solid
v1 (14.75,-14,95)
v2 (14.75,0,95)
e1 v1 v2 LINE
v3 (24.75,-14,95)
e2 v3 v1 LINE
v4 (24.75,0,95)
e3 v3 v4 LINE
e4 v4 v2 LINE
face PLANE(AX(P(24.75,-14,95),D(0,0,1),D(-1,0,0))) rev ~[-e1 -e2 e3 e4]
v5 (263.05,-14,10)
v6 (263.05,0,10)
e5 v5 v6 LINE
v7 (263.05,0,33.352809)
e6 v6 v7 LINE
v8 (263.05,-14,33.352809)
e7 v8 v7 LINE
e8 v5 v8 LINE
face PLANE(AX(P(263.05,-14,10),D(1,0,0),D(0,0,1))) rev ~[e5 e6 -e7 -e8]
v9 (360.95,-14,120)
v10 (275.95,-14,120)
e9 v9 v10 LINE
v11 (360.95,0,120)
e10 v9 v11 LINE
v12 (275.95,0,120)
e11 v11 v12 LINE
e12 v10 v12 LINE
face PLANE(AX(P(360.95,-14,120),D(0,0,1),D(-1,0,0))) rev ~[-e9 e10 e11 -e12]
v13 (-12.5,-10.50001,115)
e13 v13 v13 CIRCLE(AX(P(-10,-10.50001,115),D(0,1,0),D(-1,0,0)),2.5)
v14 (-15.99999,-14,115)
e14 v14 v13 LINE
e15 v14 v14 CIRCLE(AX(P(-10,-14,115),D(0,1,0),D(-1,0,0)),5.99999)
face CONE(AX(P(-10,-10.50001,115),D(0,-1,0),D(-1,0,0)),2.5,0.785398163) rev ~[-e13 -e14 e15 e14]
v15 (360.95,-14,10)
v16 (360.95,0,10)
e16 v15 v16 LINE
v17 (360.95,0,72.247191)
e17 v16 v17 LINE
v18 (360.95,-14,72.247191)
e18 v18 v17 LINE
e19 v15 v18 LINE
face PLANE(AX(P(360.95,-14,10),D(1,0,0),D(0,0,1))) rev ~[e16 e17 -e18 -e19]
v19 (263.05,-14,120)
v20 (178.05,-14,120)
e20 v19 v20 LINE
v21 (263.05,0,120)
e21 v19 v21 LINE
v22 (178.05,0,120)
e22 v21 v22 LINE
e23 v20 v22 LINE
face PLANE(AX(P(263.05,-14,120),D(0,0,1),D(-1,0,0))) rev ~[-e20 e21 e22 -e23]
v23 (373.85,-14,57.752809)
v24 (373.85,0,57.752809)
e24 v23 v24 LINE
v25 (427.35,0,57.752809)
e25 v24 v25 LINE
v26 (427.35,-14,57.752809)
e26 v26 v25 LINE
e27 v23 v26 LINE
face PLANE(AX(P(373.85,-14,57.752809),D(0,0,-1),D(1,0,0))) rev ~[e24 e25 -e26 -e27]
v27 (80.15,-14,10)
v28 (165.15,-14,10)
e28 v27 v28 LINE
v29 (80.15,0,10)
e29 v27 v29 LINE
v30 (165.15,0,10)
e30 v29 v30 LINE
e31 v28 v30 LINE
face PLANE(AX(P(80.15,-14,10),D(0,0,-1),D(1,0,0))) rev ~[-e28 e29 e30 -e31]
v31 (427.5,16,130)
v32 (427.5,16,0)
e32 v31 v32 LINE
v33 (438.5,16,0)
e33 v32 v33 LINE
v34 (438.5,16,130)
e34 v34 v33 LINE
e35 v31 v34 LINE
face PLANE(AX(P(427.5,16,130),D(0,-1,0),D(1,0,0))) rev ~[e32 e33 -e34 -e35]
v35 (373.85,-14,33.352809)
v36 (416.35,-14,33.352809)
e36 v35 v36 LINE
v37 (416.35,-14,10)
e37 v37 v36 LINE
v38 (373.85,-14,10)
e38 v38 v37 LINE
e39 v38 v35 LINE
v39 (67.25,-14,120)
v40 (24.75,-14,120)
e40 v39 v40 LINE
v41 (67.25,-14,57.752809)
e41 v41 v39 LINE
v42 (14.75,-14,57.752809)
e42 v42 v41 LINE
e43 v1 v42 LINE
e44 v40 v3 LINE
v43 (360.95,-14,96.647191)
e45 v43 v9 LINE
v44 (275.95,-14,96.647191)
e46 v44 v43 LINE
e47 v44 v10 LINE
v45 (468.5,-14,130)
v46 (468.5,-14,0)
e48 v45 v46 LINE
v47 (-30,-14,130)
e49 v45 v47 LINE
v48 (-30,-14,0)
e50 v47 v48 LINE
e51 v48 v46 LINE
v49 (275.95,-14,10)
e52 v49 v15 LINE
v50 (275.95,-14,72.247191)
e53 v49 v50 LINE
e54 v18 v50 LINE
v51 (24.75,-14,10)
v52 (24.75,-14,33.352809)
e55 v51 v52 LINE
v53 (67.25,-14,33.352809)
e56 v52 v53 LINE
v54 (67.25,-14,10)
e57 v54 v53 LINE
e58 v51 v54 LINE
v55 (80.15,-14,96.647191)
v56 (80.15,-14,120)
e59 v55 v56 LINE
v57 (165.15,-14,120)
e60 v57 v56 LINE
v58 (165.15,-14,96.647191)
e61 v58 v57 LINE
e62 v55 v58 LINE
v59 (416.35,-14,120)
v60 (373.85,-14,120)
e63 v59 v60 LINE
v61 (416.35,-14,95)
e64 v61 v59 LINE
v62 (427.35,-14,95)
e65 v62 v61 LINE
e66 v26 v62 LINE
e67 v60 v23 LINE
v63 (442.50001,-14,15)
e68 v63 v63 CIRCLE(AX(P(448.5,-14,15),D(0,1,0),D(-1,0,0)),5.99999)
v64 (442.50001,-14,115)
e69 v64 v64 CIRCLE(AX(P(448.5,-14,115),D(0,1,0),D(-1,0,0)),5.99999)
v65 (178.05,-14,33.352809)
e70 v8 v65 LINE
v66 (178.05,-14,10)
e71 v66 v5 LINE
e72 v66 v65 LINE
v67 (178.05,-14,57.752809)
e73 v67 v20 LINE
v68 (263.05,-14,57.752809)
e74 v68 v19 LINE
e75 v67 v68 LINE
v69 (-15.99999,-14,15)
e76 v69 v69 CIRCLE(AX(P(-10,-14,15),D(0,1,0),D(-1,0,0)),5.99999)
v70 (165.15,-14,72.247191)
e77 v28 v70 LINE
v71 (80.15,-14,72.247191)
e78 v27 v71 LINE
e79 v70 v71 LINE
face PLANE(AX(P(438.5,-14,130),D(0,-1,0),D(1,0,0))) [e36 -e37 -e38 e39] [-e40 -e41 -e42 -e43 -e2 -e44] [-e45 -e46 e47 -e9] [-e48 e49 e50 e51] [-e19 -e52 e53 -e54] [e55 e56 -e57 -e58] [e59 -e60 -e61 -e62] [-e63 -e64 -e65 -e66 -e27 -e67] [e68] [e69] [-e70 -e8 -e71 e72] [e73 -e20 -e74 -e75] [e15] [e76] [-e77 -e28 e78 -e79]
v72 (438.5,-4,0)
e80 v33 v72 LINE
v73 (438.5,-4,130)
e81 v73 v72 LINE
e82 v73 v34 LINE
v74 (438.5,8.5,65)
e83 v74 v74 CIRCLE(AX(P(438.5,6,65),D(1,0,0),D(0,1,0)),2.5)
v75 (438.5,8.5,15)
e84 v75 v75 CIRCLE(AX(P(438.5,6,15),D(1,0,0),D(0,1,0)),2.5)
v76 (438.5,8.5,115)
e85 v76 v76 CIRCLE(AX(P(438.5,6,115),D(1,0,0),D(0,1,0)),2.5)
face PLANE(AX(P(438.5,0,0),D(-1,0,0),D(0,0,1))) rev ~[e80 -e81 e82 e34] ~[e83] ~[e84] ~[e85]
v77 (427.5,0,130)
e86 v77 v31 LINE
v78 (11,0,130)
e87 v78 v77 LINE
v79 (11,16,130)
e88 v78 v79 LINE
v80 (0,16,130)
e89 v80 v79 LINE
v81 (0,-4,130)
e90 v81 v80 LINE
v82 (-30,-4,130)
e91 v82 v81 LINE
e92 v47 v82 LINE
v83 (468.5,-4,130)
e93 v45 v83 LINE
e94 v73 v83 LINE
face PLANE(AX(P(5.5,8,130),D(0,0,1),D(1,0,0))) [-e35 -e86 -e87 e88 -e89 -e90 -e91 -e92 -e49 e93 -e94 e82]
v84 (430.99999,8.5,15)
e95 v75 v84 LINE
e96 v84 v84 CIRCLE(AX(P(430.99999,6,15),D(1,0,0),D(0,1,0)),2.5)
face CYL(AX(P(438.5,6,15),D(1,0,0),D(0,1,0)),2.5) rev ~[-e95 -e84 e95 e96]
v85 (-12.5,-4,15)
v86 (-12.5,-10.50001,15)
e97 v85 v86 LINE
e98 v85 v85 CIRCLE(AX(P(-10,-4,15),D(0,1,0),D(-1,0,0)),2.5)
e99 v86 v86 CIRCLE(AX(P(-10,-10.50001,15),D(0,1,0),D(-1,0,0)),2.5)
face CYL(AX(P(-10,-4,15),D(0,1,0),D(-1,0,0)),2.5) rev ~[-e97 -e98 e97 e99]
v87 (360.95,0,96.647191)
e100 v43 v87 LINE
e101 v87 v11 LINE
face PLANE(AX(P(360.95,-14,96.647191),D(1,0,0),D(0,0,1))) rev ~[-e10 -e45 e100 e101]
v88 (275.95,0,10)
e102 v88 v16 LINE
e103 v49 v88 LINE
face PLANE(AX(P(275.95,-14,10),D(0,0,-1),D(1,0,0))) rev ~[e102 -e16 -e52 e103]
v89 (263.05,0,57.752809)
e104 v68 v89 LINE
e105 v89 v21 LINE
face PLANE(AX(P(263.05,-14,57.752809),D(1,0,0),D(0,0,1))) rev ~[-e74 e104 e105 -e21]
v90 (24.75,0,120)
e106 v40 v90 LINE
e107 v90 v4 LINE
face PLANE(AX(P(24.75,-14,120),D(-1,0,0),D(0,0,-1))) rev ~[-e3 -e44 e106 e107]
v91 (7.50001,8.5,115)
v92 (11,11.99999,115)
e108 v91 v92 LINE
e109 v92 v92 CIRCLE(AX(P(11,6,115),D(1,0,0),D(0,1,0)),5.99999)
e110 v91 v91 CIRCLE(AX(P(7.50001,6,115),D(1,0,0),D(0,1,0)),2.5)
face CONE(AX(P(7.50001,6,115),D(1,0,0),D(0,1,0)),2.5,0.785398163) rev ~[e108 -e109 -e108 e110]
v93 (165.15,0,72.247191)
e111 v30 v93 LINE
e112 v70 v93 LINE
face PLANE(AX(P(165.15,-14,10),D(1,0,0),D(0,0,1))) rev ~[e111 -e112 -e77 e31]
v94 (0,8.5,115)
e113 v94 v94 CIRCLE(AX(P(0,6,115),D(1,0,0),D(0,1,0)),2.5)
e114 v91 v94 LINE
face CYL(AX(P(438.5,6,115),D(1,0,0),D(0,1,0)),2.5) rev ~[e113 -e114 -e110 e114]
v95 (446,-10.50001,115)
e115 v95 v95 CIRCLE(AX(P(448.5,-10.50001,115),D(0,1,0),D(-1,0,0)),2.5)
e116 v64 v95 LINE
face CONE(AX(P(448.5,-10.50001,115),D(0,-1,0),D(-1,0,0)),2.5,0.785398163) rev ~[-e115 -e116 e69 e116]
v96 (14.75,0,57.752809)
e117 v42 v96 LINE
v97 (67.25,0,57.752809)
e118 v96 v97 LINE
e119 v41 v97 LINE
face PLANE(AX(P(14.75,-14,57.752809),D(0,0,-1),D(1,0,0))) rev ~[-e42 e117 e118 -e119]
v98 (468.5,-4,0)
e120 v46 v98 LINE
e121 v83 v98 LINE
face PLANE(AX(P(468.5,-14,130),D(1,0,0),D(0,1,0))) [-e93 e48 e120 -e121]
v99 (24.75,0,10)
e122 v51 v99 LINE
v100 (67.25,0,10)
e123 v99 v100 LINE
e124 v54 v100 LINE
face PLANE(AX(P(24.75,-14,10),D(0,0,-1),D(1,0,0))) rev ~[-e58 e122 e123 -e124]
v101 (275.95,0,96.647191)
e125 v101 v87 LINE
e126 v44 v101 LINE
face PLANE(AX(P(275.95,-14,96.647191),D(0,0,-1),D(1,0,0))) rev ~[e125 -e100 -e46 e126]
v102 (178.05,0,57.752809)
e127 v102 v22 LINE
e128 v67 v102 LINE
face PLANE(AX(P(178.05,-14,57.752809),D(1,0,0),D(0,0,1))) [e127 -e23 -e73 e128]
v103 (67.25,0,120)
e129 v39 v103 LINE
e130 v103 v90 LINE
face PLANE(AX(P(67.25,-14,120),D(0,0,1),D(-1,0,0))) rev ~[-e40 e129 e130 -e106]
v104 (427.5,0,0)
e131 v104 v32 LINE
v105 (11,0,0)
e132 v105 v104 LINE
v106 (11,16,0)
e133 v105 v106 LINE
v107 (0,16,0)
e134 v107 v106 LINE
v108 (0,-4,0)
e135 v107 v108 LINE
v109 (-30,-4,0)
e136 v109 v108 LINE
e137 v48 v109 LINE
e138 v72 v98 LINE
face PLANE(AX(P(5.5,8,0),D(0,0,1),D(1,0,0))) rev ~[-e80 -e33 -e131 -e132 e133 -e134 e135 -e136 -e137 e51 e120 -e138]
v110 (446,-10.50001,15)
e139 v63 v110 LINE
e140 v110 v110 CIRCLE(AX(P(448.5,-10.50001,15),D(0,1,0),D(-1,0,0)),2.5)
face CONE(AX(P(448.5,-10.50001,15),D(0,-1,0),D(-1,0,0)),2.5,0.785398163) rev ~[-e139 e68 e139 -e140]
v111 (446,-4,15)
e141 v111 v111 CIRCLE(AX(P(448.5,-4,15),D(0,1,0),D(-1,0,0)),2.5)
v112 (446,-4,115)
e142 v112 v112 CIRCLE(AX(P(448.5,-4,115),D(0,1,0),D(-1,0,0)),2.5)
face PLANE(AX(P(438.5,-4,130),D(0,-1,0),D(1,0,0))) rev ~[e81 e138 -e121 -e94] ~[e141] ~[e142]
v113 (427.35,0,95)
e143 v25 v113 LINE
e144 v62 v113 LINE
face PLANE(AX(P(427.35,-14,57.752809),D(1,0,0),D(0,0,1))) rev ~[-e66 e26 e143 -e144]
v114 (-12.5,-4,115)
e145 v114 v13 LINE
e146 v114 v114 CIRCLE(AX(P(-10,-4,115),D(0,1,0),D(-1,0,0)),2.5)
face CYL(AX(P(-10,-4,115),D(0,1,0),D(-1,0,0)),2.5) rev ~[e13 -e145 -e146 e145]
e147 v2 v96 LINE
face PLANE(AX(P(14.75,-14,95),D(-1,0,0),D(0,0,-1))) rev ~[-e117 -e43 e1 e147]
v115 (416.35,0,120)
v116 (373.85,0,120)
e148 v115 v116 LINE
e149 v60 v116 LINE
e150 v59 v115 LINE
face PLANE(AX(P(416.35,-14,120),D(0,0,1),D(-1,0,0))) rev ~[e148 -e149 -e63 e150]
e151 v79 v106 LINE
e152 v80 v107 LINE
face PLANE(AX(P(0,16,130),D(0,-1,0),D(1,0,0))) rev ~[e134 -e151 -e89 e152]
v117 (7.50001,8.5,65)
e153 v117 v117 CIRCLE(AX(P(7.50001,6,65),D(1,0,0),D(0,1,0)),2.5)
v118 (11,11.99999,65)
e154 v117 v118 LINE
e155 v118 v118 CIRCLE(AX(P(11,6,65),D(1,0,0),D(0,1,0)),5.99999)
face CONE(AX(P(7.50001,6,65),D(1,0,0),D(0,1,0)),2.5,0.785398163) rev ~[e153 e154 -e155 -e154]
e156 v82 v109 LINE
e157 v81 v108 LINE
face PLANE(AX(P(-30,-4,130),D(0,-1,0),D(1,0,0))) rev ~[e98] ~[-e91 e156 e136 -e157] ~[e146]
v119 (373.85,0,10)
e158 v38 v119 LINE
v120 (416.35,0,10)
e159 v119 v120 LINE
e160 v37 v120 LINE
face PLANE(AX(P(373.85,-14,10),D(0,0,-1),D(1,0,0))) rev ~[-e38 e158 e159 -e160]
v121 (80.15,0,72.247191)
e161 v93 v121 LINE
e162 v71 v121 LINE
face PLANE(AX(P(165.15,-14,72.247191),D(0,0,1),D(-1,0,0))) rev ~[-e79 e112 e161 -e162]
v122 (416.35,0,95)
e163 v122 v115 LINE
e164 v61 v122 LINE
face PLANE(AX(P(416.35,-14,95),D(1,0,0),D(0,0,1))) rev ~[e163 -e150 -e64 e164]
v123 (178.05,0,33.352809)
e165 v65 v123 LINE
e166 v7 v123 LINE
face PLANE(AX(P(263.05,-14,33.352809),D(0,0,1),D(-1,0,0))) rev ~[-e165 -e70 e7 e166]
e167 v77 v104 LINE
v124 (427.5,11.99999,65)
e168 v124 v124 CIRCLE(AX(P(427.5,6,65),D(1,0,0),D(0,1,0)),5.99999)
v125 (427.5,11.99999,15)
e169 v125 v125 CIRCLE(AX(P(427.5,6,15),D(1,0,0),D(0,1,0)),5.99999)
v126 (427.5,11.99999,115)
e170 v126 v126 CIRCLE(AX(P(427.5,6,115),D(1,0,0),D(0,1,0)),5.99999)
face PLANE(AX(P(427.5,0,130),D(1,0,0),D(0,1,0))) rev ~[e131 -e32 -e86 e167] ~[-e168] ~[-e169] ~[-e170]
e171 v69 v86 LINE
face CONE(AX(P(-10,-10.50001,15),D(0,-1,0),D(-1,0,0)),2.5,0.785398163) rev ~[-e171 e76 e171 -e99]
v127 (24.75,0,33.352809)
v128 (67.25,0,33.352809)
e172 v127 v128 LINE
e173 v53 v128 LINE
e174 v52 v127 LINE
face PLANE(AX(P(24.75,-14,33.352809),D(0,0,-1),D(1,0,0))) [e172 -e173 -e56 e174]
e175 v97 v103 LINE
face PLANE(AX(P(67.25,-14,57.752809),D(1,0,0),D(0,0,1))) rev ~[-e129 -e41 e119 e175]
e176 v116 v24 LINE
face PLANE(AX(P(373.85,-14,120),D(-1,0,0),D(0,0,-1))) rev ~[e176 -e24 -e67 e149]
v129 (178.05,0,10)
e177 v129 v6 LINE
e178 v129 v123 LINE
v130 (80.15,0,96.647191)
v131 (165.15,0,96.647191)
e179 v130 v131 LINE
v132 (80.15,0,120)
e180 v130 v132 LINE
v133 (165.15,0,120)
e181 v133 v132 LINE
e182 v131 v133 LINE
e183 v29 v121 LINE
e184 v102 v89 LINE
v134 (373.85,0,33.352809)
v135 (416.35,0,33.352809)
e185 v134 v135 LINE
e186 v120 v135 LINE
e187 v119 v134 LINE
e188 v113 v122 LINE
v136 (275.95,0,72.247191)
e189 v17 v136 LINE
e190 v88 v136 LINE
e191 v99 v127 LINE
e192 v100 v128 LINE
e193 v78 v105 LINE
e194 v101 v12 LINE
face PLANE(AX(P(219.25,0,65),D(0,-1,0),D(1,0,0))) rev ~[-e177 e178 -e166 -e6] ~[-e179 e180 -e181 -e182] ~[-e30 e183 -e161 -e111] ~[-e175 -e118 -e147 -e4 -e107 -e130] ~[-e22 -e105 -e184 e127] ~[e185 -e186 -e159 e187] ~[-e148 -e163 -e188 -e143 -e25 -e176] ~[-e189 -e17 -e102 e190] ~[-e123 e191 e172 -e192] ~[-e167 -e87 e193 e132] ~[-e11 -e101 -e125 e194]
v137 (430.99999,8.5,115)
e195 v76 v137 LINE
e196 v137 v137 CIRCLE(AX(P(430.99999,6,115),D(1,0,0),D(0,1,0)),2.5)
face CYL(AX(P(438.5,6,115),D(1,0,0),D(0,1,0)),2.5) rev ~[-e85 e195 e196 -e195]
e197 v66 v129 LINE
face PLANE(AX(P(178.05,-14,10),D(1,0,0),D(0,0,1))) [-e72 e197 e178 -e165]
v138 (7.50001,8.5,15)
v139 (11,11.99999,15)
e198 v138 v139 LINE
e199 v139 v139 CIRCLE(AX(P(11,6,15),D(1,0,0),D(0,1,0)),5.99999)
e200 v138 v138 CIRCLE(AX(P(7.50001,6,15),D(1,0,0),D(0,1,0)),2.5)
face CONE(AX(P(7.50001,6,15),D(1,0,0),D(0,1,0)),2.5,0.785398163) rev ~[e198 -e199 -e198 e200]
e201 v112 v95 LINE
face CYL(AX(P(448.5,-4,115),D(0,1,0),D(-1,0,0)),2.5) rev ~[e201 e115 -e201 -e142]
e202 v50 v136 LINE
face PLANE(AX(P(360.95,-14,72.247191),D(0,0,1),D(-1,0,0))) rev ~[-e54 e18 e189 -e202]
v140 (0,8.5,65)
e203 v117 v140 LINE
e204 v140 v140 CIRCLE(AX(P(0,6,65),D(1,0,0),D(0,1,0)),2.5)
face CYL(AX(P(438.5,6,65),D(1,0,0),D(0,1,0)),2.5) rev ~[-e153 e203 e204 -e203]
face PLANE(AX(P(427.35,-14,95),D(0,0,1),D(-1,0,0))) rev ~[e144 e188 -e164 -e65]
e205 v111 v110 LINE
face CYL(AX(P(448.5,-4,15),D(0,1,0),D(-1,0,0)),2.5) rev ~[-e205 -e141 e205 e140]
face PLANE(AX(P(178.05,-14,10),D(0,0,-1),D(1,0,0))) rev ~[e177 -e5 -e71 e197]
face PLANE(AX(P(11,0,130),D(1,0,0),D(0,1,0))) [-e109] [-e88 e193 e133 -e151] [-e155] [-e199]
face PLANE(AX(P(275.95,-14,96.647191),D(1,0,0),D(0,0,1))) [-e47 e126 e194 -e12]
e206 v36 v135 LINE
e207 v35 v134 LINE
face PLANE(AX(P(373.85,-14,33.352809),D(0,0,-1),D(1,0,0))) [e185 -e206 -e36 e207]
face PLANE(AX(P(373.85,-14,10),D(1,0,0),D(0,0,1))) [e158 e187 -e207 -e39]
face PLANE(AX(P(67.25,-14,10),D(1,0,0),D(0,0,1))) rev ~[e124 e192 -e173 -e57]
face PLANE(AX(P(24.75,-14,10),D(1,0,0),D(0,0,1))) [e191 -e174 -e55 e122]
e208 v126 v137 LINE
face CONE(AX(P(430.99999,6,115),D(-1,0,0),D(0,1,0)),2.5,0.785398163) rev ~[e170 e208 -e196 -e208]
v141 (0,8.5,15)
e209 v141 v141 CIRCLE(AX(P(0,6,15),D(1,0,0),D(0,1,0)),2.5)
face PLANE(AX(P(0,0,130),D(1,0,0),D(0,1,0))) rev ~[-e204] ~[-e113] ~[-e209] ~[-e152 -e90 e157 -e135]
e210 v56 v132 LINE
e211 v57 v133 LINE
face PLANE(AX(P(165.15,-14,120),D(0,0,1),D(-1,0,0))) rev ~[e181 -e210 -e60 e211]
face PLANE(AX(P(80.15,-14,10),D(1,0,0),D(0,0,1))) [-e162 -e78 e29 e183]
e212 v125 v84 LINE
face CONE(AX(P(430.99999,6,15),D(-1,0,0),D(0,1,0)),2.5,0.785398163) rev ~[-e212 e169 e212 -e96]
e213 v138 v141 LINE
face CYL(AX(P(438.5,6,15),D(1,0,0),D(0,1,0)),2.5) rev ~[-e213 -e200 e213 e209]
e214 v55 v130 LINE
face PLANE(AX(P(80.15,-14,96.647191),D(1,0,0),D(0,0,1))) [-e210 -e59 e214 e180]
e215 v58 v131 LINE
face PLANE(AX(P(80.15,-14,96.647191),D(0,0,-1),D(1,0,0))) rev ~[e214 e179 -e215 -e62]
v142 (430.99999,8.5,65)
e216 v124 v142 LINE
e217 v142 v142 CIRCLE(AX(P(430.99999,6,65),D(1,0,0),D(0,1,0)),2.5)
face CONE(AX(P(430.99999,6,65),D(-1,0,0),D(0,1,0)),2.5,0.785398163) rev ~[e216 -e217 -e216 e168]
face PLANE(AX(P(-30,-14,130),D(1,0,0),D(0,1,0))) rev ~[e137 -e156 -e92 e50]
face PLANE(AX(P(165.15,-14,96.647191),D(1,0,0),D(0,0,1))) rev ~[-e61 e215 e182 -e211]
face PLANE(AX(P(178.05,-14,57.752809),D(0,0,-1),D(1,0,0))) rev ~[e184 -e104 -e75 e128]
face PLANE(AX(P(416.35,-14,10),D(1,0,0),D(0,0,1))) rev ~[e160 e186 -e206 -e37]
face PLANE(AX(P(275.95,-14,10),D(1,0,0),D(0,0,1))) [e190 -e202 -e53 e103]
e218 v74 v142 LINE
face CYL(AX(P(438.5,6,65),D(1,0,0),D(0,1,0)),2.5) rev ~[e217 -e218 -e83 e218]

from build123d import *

# Parameters (mm, degrees)
F0_W      = 438.5
F0_H      = 130
F1_DEPTH  = 14
F2_W      = 30
F2_H      = 10
F3_DEPTH  = 130
F4_W      = 11
F4_H      = 16
F5_DEPTH  = 130
F6_W      = 42.5
F6_H      = 23.3528089888
F6_H_2    = 62.2471910113
F7_DEPTH  = 25
F8_R      = 2.5
F9_DEPTH  = 25
F10_R     = 2.5
F11_DEPTH = 468.501
F12_SIZE  = 3.49999


# Not quite as in the source:
# - a fillet or chamfer is up to 0.001 mm smaller than in the source, because OpenCascade refuses the exact size
# - a feature names something its author has since deleted; it is built from what else it names


with BuildPart() as f1:
    # F0 (on Front) → F1 (new body)
    with BuildSketch(Plane.XZ):
        with Locations((219.25, 65)):
            Rectangle(F0_W, F0_H)
    extrude(amount=F1_DEPTH)

    # F2 (on face) → F3 (join, through all)
    with BuildSketch(Plane.XY.offset(130)):
        with Locations((453.5, -9)):
            Rectangle(F2_W, F2_H)
        with Locations((-15, -9)):
            Rectangle(F2_W, F2_H)
    extrude(amount=-F3_DEPTH)

    # F4 (on face) → F5 (join, through all)
    with BuildSketch(Plane.XY.offset(130)):
        with Locations((5.5, 8)):
            Rectangle(F4_W, F4_H)
        with Locations((433, 8)):
            Rectangle(F4_W, F4_H)
    extrude(amount=-F5_DEPTH)

    # F6 (on face) → F7 (cut)
    with BuildSketch(Plane.XZ.offset(14)):
        Polygon((24.75, 120), (24.75, 95), (14.75, 95), (14.75, 57.7528089887), (24.75, 57.7528089887), (67.25, 57.7528089887), (67.25, 120), align=None)
        with Locations((46, 21.6764044942)):
            Rectangle(F6_W, F6_H)
        with Locations((101.4, 41.1235955055)):
            Rectangle(F6_W, F6_H_2)
        with Locations((143.9, 41.1235955055)):
            Rectangle(F6_W, F6_H_2)
        with Locations((101.4, 108.3235955056)):
            Rectangle(F6_W, F6_H)
        with Locations((143.9, 108.3235955056)):
            Rectangle(F6_W, F6_H)
        with Locations((199.3, 88.8764044943)):
            Rectangle(F6_W, F6_H_2)
        with Locations((241.8, 88.8764044943)):
            Rectangle(F6_W, F6_H_2)
        with Locations((199.3, 21.6764044942)):
            Rectangle(F6_W, F6_H)
        with Locations((241.8, 21.6764044942)):
            Rectangle(F6_W, F6_H)
        with Locations((297.2, 41.1235955055)):
            Rectangle(F6_W, F6_H_2)
        with Locations((339.7, 41.1235955055)):
            Rectangle(F6_W, F6_H_2)
        with Locations((339.7, 108.3235955056)):
            Rectangle(F6_W, F6_H)
        with Locations((297.2, 108.3235955056)):
            Rectangle(F6_W, F6_H)
        Polygon((416.35, 120), (373.85, 120), (373.85, 57.7528089887), (427.35, 57.7528089887), (427.35, 95), (416.35, 95), align=None)
        with Locations((395.1, 21.6764044942)):
            Rectangle(F6_W, F6_H)
    extrude(amount=-F7_DEPTH, mode=Mode.SUBTRACT)

    # F8 (on face) → F9 (cut)
    with BuildSketch(Plane(origin=(0, -4, 0), x_dir=(-1, 0, 0), z_dir=(0, 1, 0))):
        with Locations((-448.5, 115)):
            Circle(F8_R)
        with Locations((-448.5, 15)):
            Circle(F8_R)
        with Locations((10, 115)):
            Circle(F8_R)
        with Locations((10, 15)):
            Circle(F8_R)
    extrude(amount=-F9_DEPTH, mode=Mode.SUBTRACT)

    # F10 (on face) → F11 (cut, through all)
    with BuildSketch(Plane.YZ.offset(438.5)):
        with Locations((6, 115)):
            Circle(F10_R)
        with Locations((6, 15)):
            Circle(F10_R)
        with Locations((6, 65)):
            Circle(F10_R)
    extrude(amount=-F11_DEPTH, mode=Mode.SUBTRACT)

    # F12 (size 3.5 in the source; OpenCascade refuses exactly that, so slightly less here)
    f12_edges = [f1.edges().sort_by_distance(p)[0] for p in [
        (451, -14, 115),
        (451, -14, 15),
        (-7.5, -14, 115),
        (-7.5, -14, 15),
        (427.5, 3.5, 115),
        (427.5, 3.5, 65),
        (427.5, 3.5, 15),
        (11, 3.5, 115),
        (11, 3.5, 65),
        (11, 3.5, 15),
    ]]
    chamfer(f12_edges, length=F12_SIZE)


solid = f1.part
